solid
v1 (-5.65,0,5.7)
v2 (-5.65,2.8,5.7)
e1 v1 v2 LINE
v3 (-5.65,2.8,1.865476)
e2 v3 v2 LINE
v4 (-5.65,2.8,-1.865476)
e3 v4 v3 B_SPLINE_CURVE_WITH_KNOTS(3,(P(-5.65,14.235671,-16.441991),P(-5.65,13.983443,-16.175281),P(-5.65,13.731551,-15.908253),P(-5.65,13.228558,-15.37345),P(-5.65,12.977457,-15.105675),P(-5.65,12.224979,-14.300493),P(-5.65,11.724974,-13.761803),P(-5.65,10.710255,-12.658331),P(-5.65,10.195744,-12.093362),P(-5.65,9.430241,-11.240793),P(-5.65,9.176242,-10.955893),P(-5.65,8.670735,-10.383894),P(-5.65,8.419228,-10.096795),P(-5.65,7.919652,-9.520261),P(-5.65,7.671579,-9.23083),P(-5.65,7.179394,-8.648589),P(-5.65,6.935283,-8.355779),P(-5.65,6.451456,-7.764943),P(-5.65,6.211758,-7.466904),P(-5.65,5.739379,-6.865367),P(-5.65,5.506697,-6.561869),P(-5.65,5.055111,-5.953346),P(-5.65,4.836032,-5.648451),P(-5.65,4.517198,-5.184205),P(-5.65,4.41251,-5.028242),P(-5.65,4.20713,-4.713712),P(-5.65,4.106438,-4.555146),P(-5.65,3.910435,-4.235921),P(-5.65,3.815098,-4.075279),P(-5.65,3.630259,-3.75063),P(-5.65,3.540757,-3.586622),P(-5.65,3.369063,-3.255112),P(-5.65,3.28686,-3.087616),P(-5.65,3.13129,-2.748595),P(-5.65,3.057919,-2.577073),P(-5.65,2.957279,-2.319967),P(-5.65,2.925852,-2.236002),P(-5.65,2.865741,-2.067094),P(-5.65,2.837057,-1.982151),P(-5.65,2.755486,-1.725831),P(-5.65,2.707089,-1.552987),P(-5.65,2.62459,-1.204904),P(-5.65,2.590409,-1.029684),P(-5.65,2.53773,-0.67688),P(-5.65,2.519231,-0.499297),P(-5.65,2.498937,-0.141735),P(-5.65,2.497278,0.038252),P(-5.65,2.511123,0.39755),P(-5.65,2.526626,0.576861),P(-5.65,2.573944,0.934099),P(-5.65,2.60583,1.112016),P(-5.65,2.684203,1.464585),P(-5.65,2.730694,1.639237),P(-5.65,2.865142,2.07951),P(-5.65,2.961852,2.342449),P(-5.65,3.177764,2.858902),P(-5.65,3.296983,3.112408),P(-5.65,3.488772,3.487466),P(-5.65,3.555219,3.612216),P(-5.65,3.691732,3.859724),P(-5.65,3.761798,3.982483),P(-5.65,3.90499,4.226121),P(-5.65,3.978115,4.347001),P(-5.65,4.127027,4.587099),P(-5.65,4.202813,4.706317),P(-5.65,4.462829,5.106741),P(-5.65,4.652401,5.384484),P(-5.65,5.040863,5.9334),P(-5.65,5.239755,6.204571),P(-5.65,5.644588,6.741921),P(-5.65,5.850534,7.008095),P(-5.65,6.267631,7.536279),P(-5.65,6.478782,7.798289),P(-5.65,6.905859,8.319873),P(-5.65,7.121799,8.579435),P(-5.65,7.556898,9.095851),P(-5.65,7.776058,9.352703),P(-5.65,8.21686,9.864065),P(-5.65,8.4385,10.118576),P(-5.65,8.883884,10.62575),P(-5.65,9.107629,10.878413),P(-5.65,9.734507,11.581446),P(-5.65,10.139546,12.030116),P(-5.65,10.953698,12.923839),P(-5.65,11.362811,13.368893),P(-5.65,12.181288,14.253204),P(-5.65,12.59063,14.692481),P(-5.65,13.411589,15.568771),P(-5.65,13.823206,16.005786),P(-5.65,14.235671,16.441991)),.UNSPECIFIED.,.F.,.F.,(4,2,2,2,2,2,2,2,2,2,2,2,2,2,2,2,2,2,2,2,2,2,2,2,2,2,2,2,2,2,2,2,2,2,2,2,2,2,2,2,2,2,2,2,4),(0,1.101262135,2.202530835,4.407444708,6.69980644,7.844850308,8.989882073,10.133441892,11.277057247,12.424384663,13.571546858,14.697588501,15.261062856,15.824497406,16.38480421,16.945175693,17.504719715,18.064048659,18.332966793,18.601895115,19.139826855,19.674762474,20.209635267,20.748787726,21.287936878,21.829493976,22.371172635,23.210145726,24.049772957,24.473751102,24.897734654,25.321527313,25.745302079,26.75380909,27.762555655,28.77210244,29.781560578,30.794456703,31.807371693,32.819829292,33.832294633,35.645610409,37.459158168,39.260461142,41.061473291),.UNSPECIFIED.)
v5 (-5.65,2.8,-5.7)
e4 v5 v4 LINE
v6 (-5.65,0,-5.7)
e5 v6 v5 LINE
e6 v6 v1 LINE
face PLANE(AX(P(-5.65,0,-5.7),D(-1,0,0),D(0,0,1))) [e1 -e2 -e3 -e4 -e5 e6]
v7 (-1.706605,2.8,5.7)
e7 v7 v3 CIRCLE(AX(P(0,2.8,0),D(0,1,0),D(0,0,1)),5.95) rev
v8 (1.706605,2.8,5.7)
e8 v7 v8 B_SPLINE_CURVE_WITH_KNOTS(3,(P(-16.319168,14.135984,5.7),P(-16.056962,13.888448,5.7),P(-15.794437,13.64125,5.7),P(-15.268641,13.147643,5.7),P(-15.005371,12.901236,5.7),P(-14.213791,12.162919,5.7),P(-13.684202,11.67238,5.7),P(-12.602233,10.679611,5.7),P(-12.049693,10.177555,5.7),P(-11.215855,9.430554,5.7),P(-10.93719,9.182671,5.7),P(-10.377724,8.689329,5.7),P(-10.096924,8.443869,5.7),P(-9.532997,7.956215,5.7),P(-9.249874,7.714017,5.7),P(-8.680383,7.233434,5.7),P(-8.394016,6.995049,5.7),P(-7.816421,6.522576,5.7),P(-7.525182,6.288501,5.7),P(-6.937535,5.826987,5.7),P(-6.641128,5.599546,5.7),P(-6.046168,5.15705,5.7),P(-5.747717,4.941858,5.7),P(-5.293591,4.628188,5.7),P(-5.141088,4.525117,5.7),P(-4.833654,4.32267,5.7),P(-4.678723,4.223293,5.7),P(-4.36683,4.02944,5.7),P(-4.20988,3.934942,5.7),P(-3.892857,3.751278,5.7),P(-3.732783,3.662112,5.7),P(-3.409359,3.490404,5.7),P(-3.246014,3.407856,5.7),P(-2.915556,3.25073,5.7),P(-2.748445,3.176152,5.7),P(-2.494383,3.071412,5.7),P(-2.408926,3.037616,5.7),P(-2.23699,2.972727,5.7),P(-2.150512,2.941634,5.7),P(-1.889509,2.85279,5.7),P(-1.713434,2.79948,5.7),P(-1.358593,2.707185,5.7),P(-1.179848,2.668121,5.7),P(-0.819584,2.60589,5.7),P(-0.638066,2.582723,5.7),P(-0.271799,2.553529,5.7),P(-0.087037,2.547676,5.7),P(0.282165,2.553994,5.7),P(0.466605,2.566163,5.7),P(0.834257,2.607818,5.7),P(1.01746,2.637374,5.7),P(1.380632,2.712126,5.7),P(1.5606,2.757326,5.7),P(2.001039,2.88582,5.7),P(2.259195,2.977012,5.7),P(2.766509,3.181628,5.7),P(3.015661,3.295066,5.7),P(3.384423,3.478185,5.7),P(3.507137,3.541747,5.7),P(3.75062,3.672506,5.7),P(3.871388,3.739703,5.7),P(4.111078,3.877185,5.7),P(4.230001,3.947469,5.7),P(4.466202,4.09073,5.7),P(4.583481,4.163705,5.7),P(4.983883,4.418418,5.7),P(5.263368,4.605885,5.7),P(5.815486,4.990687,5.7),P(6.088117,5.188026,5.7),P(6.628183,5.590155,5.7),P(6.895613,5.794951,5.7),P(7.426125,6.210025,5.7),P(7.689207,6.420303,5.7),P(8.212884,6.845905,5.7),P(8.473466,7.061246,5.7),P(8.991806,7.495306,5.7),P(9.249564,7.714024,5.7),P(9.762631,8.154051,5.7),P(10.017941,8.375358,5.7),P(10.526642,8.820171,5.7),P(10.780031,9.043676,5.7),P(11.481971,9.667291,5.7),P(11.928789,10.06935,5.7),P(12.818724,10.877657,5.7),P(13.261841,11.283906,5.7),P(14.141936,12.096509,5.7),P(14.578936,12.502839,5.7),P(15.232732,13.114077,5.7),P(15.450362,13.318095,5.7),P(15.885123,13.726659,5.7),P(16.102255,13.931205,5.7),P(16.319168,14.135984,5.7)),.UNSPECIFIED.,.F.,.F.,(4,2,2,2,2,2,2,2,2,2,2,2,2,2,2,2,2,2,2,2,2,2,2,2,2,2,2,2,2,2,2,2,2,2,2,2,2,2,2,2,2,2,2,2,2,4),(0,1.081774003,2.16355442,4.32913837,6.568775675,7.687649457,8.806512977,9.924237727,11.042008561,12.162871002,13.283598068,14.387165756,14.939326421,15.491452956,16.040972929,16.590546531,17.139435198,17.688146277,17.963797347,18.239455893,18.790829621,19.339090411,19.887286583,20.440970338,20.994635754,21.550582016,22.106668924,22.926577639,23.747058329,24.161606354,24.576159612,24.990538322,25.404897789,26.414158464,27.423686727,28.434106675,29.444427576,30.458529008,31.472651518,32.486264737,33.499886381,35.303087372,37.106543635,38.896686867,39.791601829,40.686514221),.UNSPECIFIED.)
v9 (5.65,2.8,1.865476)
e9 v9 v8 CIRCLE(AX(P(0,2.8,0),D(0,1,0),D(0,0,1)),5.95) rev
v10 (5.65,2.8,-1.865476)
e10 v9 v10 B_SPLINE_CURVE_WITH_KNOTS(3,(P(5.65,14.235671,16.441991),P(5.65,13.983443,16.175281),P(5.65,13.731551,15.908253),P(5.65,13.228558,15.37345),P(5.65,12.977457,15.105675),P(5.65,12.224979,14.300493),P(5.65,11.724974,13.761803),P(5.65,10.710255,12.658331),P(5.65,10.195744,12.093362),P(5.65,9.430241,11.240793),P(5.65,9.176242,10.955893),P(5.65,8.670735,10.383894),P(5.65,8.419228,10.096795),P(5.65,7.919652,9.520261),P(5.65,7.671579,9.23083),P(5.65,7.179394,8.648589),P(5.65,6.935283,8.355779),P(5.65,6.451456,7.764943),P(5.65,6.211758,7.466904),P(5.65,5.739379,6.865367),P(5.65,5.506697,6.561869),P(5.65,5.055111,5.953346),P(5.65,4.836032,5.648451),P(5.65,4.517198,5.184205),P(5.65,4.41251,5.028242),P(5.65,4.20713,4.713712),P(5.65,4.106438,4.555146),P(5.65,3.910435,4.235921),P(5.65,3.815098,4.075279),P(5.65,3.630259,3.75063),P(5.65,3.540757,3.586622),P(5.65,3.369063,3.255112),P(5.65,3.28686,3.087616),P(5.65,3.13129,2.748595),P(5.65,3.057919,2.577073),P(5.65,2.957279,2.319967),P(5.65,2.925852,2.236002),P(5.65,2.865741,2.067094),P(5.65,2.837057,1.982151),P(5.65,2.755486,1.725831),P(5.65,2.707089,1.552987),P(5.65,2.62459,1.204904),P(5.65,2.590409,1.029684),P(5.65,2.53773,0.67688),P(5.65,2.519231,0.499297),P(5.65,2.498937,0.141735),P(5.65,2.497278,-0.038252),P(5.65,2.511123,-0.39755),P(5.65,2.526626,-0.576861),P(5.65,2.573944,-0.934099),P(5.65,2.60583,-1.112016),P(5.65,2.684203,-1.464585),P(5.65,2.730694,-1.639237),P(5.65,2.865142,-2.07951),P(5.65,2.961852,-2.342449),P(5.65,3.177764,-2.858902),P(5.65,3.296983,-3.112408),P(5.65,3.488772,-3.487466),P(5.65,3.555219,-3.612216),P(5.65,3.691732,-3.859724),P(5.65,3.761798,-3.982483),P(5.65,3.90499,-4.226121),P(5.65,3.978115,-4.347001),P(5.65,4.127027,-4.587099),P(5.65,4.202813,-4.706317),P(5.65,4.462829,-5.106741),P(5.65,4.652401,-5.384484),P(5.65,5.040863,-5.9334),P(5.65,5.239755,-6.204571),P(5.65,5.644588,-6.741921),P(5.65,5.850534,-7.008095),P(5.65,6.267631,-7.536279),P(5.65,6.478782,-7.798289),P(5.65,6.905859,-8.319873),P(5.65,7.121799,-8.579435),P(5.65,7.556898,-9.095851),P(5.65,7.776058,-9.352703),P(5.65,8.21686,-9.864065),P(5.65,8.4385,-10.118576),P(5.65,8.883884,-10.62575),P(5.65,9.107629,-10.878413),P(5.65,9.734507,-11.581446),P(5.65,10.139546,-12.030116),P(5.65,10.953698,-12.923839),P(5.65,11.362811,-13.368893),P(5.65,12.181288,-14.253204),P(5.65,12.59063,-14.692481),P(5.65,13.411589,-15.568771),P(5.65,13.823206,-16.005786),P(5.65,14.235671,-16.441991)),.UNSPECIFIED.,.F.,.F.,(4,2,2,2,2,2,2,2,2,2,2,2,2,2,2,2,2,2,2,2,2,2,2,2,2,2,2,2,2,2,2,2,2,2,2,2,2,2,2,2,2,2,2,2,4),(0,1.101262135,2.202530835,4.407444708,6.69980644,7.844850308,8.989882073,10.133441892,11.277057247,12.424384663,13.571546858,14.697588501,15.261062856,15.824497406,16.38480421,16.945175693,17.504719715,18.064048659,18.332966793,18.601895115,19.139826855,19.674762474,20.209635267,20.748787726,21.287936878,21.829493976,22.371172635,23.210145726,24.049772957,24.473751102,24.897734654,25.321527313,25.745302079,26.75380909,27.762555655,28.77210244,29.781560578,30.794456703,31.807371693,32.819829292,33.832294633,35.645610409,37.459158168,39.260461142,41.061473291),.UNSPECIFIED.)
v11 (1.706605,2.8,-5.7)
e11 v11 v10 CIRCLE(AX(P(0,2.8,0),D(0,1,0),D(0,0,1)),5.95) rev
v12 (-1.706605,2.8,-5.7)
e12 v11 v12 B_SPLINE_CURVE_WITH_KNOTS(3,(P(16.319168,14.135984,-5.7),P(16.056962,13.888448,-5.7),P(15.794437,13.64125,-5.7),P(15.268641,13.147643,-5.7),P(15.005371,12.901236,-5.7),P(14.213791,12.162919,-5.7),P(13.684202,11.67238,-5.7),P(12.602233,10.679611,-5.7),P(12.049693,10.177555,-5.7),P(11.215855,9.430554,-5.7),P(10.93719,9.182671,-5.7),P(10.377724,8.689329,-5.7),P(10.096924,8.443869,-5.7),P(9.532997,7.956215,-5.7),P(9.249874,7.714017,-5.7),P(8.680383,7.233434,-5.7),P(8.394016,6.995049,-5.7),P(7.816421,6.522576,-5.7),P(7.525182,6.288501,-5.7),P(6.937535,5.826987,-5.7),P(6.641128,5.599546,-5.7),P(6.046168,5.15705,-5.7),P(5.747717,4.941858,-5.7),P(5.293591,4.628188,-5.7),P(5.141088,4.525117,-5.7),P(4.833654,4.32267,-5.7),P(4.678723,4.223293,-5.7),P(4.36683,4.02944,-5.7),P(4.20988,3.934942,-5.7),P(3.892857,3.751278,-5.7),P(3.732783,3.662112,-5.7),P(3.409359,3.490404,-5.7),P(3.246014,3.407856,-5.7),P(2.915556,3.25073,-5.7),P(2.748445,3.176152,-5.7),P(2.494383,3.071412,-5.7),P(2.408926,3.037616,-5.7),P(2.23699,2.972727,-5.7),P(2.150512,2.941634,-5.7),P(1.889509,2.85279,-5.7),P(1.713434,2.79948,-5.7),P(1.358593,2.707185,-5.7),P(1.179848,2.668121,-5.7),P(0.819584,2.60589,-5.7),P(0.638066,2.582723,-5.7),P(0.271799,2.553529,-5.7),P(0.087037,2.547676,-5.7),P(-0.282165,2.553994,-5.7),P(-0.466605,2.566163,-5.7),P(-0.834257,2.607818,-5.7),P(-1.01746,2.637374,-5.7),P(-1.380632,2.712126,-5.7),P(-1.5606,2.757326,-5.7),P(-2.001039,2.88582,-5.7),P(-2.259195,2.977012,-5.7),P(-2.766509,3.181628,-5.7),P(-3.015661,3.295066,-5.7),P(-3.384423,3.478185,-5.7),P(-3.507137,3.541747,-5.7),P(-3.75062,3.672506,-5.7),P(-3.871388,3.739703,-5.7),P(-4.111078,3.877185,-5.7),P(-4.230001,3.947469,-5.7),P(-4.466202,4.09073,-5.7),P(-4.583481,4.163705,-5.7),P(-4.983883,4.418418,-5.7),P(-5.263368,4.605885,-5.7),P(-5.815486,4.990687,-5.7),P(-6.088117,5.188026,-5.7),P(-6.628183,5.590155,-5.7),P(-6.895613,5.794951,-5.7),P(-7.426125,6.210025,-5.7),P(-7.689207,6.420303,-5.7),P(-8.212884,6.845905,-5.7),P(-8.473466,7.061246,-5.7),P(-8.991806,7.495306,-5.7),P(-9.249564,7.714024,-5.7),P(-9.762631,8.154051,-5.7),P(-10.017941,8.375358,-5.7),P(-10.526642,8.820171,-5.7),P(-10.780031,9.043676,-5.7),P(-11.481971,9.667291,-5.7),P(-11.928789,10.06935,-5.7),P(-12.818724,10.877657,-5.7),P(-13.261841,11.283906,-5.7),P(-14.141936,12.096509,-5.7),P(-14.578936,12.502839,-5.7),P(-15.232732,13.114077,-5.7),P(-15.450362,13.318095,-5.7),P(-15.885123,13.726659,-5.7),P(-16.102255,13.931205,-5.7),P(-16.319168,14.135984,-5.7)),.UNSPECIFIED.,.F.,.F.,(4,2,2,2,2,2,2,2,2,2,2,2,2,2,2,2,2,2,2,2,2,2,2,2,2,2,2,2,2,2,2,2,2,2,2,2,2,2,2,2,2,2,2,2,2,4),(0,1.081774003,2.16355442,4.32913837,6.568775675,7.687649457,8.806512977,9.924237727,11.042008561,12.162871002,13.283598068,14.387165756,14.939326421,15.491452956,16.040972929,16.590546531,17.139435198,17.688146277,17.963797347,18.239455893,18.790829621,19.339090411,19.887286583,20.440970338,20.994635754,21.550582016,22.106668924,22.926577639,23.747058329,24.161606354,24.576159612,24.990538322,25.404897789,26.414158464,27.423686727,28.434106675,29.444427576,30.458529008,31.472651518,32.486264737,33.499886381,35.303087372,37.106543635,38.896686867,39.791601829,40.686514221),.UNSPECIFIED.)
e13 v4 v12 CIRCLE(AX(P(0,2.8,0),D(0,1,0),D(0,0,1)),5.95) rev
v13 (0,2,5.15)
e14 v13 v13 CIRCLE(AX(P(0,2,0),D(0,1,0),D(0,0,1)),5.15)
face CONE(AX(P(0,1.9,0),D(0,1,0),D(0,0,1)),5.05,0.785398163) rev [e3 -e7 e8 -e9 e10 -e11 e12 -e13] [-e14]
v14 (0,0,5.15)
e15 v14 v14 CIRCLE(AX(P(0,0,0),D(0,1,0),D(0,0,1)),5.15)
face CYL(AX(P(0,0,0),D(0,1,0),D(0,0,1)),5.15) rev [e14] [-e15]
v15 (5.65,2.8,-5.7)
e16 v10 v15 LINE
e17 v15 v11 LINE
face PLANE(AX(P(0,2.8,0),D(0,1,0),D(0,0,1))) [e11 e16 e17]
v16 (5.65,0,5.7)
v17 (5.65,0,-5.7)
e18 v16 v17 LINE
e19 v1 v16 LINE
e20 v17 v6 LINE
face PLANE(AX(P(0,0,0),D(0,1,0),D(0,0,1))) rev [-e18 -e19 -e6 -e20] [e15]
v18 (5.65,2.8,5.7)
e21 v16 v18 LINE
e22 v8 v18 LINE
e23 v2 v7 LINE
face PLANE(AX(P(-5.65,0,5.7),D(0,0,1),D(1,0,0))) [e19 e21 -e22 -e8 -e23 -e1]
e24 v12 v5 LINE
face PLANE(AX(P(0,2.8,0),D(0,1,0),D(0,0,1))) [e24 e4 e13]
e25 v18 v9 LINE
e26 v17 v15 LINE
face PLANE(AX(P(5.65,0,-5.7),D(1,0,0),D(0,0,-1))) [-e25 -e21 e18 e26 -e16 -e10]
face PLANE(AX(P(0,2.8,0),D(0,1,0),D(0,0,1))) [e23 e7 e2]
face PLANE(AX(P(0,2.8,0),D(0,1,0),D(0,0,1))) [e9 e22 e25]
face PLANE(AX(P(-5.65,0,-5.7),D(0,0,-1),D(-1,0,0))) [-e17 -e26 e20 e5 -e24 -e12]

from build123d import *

# Parameters (mm, degrees)
SKETCH_1_W          = 11.9
SKETCH_1_H          = 11.9
SKETCH_1_R          = 5.05
EXTRUDE_1_DEPTH     = 2.8
CHAMFER_1_SIZE      = 0.9
SKETCH1_OUTSIDE_W   = 17.312
SKETCH1_OUTSIDE_H   = 17.312
SKETCH1_OUTSIDE_W_2 = 11.3
SKETCH1_OUTSIDE_H_2 = 11.4
CUT_EXTRUDE1_DEPTH  = 9.868201622
SKETCH2_R           = 5.15
CUT_EXTRUDE2_DEPTH  = 9.500147058


with BuildPart() as part:
    # 草图1 → 凸台-拉伸1 (new body)
    with BuildSketch(Plane(origin=(0, 0, 0), x_dir=(1, 0, 0), z_dir=(0, 1, 0))):
        Rectangle(SKETCH_1_W, SKETCH_1_H)
        with Locations(Location((0, 0, 0), (0, 0, 270))):
            Circle(SKETCH_1_R, mode=Mode.SUBTRACT)
    extrude(amount=EXTRUDE_1_DEPTH)

    # 倒角1
    chamfer_1_edges = [part.edges().sort_by_distance(p)[0] for p in [
        (0, 2.8, -5.05),
    ]]
    chamfer(chamfer_1_edges, length=CHAMFER_1_SIZE - 0.0001)  # a hair under: the kernel refuses the full size

    # Sketch1 outside → Cut-Extrude1 (cut, through all)
    with BuildSketch(Plane(origin=(0, 2.8, 0), x_dir=(1, 0, 0), z_dir=(0, 1, 0))):
        Rectangle(SKETCH1_OUTSIDE_W, SKETCH1_OUTSIDE_H)
        Rectangle(SKETCH1_OUTSIDE_W_2, SKETCH1_OUTSIDE_H_2, mode=Mode.SUBTRACT)
    extrude(amount=-CUT_EXTRUDE1_DEPTH, mode=Mode.SUBTRACT)

    # Sketch2 → Cut-Extrude2 (cut, through all)
    with BuildSketch(Plane(origin=(0, 2.8, 0), x_dir=(1, 0, 0), z_dir=(0, 1, 0))):
        with Locations(Location((0, 0, 0), (0, 0, 270))):
            Circle(SKETCH2_R)
    extrude(amount=-CUT_EXTRUDE2_DEPTH, mode=Mode.SUBTRACT)


solid = part.part
